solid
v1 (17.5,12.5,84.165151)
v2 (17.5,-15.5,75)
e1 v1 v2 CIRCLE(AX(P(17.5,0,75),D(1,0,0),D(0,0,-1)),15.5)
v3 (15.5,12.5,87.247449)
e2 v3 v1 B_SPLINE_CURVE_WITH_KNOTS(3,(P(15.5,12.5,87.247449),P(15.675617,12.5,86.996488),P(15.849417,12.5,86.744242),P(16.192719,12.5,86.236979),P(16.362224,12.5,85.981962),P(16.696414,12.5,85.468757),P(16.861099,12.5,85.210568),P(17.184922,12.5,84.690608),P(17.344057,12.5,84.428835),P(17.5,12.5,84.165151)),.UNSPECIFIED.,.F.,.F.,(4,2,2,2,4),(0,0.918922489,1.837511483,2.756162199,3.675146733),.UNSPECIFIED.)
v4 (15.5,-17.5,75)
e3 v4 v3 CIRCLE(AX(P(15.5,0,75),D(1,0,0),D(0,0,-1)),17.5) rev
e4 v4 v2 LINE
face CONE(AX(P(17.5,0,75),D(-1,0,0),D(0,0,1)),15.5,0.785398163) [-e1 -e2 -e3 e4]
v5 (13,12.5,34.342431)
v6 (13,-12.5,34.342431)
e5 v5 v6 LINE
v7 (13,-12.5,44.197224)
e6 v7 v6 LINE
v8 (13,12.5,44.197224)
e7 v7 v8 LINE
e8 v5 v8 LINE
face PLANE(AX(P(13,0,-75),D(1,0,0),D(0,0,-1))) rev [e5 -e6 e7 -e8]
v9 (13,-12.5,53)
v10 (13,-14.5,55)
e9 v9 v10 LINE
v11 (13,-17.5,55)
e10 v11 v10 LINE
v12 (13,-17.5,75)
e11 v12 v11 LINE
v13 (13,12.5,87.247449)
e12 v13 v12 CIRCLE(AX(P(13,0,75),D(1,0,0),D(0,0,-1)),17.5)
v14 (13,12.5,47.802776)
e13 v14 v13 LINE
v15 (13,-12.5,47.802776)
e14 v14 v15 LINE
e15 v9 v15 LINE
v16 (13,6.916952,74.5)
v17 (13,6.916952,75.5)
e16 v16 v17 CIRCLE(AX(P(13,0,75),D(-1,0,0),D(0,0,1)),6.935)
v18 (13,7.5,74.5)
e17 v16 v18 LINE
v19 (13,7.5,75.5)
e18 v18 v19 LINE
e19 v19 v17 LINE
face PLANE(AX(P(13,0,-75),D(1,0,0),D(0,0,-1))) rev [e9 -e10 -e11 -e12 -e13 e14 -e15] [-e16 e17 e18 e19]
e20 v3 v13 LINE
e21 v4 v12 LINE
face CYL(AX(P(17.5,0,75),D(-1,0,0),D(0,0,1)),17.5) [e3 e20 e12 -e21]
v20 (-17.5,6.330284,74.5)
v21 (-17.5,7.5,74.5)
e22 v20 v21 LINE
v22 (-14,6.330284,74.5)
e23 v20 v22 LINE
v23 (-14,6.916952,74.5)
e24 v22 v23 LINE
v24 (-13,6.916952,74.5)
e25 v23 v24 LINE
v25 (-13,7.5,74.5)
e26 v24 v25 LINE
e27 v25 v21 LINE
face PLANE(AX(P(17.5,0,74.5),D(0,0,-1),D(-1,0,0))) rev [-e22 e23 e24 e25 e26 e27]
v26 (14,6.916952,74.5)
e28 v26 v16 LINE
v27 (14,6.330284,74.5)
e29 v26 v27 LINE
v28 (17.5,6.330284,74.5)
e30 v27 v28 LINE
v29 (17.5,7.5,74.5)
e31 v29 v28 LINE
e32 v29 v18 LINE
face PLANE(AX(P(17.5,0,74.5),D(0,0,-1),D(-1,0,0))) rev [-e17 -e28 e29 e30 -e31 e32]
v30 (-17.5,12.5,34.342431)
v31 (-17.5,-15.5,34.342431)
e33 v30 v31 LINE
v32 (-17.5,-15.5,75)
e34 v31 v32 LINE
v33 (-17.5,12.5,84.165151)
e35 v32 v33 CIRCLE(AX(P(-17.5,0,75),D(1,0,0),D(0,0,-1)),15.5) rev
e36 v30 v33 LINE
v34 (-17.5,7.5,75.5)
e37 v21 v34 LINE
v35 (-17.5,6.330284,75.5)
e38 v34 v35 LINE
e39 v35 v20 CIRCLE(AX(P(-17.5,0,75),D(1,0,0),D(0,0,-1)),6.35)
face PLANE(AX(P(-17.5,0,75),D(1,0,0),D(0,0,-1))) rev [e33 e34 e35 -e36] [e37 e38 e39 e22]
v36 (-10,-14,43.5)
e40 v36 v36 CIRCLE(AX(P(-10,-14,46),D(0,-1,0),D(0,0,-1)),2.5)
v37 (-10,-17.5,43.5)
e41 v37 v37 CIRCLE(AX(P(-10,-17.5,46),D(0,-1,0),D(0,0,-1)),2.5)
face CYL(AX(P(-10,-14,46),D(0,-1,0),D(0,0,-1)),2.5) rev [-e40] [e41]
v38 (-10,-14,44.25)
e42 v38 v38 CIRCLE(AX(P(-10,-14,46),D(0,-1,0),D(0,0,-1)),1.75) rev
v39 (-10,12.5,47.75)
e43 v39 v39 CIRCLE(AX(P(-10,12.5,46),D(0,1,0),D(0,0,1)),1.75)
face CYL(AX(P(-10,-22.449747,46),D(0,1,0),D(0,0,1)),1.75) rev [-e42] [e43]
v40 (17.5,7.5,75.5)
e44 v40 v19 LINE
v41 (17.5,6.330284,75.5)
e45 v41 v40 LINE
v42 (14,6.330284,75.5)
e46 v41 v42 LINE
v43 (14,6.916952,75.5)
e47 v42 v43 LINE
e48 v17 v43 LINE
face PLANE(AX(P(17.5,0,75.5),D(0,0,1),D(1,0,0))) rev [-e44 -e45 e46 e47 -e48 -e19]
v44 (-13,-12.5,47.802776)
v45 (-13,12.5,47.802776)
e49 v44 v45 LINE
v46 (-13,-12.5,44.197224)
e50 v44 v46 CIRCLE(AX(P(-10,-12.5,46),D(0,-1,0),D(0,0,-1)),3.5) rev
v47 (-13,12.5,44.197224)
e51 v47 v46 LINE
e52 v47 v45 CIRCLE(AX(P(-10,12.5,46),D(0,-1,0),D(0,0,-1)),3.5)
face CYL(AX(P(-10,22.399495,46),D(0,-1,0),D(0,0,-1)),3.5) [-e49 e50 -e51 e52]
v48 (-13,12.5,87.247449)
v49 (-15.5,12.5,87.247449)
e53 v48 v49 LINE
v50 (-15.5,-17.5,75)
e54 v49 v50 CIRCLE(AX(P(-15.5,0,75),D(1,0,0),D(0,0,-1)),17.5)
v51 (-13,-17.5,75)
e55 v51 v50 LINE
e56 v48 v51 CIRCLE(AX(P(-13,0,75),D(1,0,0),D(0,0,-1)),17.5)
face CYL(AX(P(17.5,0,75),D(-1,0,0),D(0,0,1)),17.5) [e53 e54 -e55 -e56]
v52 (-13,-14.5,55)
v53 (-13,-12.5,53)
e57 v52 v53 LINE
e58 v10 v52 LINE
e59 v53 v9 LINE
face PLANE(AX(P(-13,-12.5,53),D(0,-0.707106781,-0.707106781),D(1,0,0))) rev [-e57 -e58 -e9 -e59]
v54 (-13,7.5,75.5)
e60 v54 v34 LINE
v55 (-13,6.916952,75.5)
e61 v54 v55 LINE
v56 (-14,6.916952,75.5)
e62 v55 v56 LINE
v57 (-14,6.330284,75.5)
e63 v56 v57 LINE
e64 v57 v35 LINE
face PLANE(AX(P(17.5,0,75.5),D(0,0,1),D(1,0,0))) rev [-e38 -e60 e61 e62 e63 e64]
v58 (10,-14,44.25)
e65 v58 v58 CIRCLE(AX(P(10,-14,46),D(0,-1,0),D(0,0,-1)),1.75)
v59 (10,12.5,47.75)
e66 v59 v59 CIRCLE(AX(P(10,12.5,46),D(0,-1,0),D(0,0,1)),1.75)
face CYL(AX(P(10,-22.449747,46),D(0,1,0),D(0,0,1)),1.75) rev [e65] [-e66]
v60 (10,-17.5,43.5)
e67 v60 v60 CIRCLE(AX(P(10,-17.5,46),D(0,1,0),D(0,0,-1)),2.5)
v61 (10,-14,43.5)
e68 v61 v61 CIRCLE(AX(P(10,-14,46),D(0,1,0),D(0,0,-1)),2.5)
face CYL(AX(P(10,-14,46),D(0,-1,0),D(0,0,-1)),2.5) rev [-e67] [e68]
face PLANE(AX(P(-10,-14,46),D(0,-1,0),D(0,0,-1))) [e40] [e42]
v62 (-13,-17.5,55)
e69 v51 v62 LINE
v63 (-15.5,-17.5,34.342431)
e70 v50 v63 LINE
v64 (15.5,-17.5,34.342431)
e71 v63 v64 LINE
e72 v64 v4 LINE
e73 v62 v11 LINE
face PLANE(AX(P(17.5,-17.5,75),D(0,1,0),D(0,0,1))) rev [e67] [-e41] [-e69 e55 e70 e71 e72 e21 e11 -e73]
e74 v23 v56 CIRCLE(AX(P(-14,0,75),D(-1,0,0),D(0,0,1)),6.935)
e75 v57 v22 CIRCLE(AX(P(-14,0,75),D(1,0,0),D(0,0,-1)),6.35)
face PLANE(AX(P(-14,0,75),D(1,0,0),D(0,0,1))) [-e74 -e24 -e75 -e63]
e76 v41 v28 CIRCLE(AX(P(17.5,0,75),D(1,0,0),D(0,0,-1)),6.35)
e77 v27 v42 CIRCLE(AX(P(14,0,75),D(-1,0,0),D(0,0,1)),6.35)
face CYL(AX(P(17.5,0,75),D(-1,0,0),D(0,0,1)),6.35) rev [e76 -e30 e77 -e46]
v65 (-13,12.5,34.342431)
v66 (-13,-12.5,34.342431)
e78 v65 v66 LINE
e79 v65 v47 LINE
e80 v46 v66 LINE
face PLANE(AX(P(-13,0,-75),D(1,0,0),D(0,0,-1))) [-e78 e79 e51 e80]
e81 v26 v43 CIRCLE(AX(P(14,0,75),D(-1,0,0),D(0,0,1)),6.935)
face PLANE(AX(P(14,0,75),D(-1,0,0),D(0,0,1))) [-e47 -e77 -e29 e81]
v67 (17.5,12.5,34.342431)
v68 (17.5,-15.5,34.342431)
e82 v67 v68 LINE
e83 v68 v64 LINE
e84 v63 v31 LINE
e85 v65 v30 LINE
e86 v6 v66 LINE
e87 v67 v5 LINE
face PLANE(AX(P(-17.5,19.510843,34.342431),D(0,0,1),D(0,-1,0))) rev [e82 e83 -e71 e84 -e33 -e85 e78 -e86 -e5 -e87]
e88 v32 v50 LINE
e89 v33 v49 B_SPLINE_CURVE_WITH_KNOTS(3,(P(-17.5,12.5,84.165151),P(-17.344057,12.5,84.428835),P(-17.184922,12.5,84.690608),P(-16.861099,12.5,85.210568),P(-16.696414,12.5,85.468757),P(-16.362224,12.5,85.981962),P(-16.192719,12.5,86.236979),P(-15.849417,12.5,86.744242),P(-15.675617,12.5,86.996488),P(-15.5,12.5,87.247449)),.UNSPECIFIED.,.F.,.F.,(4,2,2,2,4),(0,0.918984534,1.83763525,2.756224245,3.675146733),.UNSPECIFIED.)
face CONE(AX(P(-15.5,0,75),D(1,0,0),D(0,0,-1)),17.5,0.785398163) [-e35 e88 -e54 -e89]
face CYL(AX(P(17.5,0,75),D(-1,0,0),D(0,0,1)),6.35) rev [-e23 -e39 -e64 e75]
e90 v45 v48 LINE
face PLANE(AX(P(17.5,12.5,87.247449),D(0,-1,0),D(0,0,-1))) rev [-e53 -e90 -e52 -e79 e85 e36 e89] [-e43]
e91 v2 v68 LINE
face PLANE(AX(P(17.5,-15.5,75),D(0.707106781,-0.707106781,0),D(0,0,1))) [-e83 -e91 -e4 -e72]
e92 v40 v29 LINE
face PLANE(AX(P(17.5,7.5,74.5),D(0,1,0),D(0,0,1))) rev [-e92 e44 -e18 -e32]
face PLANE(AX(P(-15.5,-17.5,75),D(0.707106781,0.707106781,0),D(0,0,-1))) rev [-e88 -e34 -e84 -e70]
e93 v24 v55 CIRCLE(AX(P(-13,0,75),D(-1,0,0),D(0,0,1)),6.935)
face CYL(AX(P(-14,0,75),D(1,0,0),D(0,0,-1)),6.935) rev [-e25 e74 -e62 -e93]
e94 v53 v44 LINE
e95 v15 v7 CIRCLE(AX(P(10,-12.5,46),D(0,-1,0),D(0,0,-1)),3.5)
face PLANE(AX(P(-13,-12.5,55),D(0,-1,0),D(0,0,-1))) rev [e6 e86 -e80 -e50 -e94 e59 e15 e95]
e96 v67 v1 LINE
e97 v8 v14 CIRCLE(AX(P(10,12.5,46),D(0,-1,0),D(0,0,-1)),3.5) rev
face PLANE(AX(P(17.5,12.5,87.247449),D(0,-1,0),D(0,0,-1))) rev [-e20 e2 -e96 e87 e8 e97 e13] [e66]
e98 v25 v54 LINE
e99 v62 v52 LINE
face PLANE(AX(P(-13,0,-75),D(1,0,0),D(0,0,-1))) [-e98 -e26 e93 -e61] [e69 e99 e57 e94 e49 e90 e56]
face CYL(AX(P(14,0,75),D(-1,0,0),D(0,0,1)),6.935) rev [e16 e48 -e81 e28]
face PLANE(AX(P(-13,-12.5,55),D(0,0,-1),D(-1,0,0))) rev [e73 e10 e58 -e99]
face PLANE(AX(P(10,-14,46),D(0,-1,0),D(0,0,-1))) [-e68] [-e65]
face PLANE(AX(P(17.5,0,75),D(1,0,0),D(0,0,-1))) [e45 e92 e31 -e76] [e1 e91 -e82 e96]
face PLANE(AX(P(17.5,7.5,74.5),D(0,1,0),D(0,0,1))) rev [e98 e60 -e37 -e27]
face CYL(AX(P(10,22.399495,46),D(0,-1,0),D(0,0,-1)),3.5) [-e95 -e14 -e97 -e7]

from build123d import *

# Parameters (mm, degrees)
SKETCH1_R               = 6.35
BOSS_EXTRUDE1_DEPTH     = 17.5
CUT_EXTRUDE1_DEPTH      = 13
CHAMFER1_SIZE           = 2
SKETCH4_R               = 3.5
BOSS_EXTRUDE2_DEPTH     = 25
SKETCH6_R               = 1.75
CUT_EXTRUDE2_DEPTH      = 30
SKETCH7_R               = 2.5
CUT_EXTRUDE3_DEPTH      = 3.5
CUT_EXTRUDE4_DEPTH      = 101.436547133
CUT_EXTRUDE4_DEPTH_BACK = 101.436547133
SKETCH8_W               = 138.060190548
SKETCH8_H               = 48.357154547
SKETCH9_R               = 6.935
CUT_EXTRUDE5_DEPTH      = 1
MIRROR1_START           = -12.5
MIRROR1_OUTLINE_R       = 1.75
MIRROR1_DEPTH           = 25
MIRROR1_START_2         = -17.5
MIRROR1_2_OUTLINE_R     = 2.5
MIRROR1_2_DEPTH         = 3.5
MIRROR1_START_3         = -14
MIRROR1_3_OUTLINE_R     = 1.75
MIRROR1_3_DEPTH         = 1.5
MIRROR1_4_OUTLINE_R     = 6.935
MIRROR1_4_OUTLINE_R_2   = 6.35
MIRROR1_4_DEPTH         = 1
CUT_EXTRUDE6_DEPTH      = 101.436547133
CUT_EXTRUDE6_DEPTH_BACK = 101.436547133
SKETCH10_W              = 1
SKETCH10_H              = 7.5


# Read off the part's stored shape, not the designer's step: Mirror1
with BuildPart() as part:
    # Sketch1 → Boss-Extrude1 (new, symmetric)
    with BuildSketch(Plane(origin=(0, 0, 0), x_dir=(0, 0, -1), z_dir=(1, 0, 0))):
        with BuildLine():
            Line((-75, -17.5), (75, -17.5))
            ThreePointArc((75, -17.5), (91.201851746, -6.614378278), (87.247448714, 12.5))
            Line((87.247448714, 12.5), (-87.247448714, 12.5))
            ThreePointArc((-87.247448714, 12.5), (-91.201851746, -6.614378278), (-75, -17.5))
        make_face()
        with Locations((-75, 0)):
            Circle(SKETCH1_R, mode=Mode.SUBTRACT)
        with Locations((75, 0)):
            Circle(SKETCH1_R, mode=Mode.SUBTRACT)
    extrude(amount=BOSS_EXTRUDE1_DEPTH, both=True)

    # Sketch3 → Cut-Extrude1 (cut, symmetric)
    with BuildSketch(Plane(origin=(0, 0, 0), x_dir=(0, 0, -1), z_dir=(1, 0, 0))):
        with BuildLine():
            Line((-92.5, 12.5), (75, 12.5))
            ThreePointArc((75, 12.5), (87.5, 0), (75, -12.5))
            Line((75, -12.5), (-55, -12.5))
            Line((-55, -12.5), (-55, -17.5))
            Line((-55, -17.5), (-92.5, -17.5))
            Line((-92.5, -17.5), (-92.5, 12.5))
        make_face()
    extrude(amount=CUT_EXTRUDE1_DEPTH, both=True, mode=Mode.SUBTRACT)

    # Chamfer1
    chamfer1_edges = [part.edges().sort_by_distance(p)[0] for p in [
        (17.5, -6.614378278, -91.201851746),
        (0, -12.5, 55),
        (17.5, -6.614378278, 91.201851746),
        (-17.5, -6.614378278, -91.201851746),
        (-17.5, -17.5, 0),
        (-17.5, -6.614378278, 91.201851746),
        (17.5, -17.5, 0),
    ]]
    chamfer(chamfer1_edges, length=CHAMFER1_SIZE)

    # Sketch4 → Boss-Extrude2 (add)
    with BuildSketch(Plane(origin=(0, -12.5, 0), x_dir=(1, 0, 0), z_dir=(0, 1, 0))):
        with Locations((-10, 62.5)):
            Circle(SKETCH4_R)
        with Locations((-10, 26.333333333)):
            Circle(SKETCH4_R)
        with Locations((-10, -9.833333333)):
            Circle(SKETCH4_R)
        with Locations((-10, -46)):
            Circle(SKETCH4_R)
    extrude(amount=BOSS_EXTRUDE2_DEPTH)

    # Sketch6 → Cut-Extrude2 (cut)
    with BuildSketch(Plane(origin=(0, 12.5, 0), x_dir=(1, 0, 0), z_dir=(0, 1, 0))):
        with Locations(Location((-10, 62.5, 0), (0, 0, 270))):
            Circle(SKETCH6_R)
        with Locations(Location((-10, 26.333333333, 0), (0, 0, 270))):
            Circle(SKETCH6_R)
        with Locations(Location((-10, -9.833333333, 0), (0, 0, 270))):
            Circle(SKETCH6_R)
        with Locations(Location((-10, -46, 0), (0, 0, 270))):
            Circle(SKETCH6_R)
    extrude(amount=-CUT_EXTRUDE2_DEPTH, mode=Mode.SUBTRACT)

    # Sketch7 → Cut-Extrude3 (cut)
    with BuildSketch(Plane.XZ.offset(17.5)):
        with Locations(Location((-10, 46, 0), (0, 0, 270))):
            Circle(SKETCH7_R)
        with Locations(Location((-10, 9.833333333, 0), (0, 0, 270))):
            Circle(SKETCH7_R)
        with Locations(Location((-10, -26.333333333, 0), (0, 0, 270))):
            Circle(SKETCH7_R)
        with Locations(Location((-10, -62.5, 0), (0, 0, 270))):
            Circle(SKETCH7_R)
    extrude(amount=-CUT_EXTRUDE3_DEPTH, mode=Mode.SUBTRACT)

    # Sketch8 → Cut-Extrude4 (cut, two sides: drawn at the far end of the back side and taken through both)
    with BuildSketch(Plane(origin=(17.5, 0, 0), x_dir=(0, 0, -1), z_dir=(1, 0, 0)).offset(-CUT_EXTRUDE4_DEPTH_BACK)):
        with Locations((34.687663788, -4.667734514)):
            Rectangle(SKETCH8_W, SKETCH8_H)
    extrude(amount=CUT_EXTRUDE4_DEPTH + CUT_EXTRUDE4_DEPTH_BACK, mode=Mode.SUBTRACT)

    # Sketch9 → Cut-Extrude5 (cut)
    with BuildSketch(Plane.ZY.offset(-13)):
        with Locations((75, 0)):
            Circle(SKETCH9_R)
    extrude(amount=-CUT_EXTRUDE5_DEPTH, mode=Mode.SUBTRACT)

    # Mirror1 outline → Mirror1 (add)
    with BuildSketch(Plane(origin=(0, 0, 0), x_dir=(1, 0, 0), z_dir=(0, 1, 0)).offset(MIRROR1_START)):
        with BuildLine():
            ThreePointArc((13, -44.197224362), (6.5, -46), (13, -47.802775638))
            Line((13, -47.802775638), (13, -44.197224362))
        make_face()
        with Locations((10, -46)):
            Circle(MIRROR1_OUTLINE_R, mode=Mode.SUBTRACT)
    extrude(amount=MIRROR1_DEPTH)

    # Mirror1 2 outline → Mirror1 2 (cut)
    with BuildSketch(Plane(origin=(0, 0, 0), x_dir=(1, 0, 0), z_dir=(0, 1, 0)).offset(MIRROR1_START_2)):
        with Locations((10, -46)):
            Circle(MIRROR1_2_OUTLINE_R)
    extrude(amount=MIRROR1_2_DEPTH, mode=Mode.SUBTRACT)

    # Mirror1 3 outline → Mirror1 3 (cut)
    with BuildSketch(Plane(origin=(0, 0, 0), x_dir=(1, 0, 0), z_dir=(0, 1, 0)).offset(MIRROR1_START_3)):
        with Locations((10, -46)):
            Circle(MIRROR1_3_OUTLINE_R)
    extrude(amount=MIRROR1_3_DEPTH, mode=Mode.SUBTRACT)

    # Mirror1 4 outline → Mirror1 4 (cut)
    with BuildSketch(Plane.YZ.offset(MIRROR1_START_3)):
        with Locations((0, 75)):
            Circle(MIRROR1_4_OUTLINE_R)
        with Locations((0, 75)):
            Circle(MIRROR1_4_OUTLINE_R_2, mode=Mode.SUBTRACT)
    extrude(amount=MIRROR1_4_DEPTH, mode=Mode.SUBTRACT)

    # Sketch10 → Cut-Extrude6 (cut, two sides: drawn at the far end of the back side and taken through both)
    with BuildSketch(Plane.ZY.offset(17.5).offset(-CUT_EXTRUDE6_DEPTH_BACK)):
        with Locations((75, 3.75)):
            Rectangle(SKETCH10_W, SKETCH10_H)
    extrude(amount=CUT_EXTRUDE6_DEPTH + CUT_EXTRUDE6_DEPTH_BACK, mode=Mode.SUBTRACT)


solid = part.part
